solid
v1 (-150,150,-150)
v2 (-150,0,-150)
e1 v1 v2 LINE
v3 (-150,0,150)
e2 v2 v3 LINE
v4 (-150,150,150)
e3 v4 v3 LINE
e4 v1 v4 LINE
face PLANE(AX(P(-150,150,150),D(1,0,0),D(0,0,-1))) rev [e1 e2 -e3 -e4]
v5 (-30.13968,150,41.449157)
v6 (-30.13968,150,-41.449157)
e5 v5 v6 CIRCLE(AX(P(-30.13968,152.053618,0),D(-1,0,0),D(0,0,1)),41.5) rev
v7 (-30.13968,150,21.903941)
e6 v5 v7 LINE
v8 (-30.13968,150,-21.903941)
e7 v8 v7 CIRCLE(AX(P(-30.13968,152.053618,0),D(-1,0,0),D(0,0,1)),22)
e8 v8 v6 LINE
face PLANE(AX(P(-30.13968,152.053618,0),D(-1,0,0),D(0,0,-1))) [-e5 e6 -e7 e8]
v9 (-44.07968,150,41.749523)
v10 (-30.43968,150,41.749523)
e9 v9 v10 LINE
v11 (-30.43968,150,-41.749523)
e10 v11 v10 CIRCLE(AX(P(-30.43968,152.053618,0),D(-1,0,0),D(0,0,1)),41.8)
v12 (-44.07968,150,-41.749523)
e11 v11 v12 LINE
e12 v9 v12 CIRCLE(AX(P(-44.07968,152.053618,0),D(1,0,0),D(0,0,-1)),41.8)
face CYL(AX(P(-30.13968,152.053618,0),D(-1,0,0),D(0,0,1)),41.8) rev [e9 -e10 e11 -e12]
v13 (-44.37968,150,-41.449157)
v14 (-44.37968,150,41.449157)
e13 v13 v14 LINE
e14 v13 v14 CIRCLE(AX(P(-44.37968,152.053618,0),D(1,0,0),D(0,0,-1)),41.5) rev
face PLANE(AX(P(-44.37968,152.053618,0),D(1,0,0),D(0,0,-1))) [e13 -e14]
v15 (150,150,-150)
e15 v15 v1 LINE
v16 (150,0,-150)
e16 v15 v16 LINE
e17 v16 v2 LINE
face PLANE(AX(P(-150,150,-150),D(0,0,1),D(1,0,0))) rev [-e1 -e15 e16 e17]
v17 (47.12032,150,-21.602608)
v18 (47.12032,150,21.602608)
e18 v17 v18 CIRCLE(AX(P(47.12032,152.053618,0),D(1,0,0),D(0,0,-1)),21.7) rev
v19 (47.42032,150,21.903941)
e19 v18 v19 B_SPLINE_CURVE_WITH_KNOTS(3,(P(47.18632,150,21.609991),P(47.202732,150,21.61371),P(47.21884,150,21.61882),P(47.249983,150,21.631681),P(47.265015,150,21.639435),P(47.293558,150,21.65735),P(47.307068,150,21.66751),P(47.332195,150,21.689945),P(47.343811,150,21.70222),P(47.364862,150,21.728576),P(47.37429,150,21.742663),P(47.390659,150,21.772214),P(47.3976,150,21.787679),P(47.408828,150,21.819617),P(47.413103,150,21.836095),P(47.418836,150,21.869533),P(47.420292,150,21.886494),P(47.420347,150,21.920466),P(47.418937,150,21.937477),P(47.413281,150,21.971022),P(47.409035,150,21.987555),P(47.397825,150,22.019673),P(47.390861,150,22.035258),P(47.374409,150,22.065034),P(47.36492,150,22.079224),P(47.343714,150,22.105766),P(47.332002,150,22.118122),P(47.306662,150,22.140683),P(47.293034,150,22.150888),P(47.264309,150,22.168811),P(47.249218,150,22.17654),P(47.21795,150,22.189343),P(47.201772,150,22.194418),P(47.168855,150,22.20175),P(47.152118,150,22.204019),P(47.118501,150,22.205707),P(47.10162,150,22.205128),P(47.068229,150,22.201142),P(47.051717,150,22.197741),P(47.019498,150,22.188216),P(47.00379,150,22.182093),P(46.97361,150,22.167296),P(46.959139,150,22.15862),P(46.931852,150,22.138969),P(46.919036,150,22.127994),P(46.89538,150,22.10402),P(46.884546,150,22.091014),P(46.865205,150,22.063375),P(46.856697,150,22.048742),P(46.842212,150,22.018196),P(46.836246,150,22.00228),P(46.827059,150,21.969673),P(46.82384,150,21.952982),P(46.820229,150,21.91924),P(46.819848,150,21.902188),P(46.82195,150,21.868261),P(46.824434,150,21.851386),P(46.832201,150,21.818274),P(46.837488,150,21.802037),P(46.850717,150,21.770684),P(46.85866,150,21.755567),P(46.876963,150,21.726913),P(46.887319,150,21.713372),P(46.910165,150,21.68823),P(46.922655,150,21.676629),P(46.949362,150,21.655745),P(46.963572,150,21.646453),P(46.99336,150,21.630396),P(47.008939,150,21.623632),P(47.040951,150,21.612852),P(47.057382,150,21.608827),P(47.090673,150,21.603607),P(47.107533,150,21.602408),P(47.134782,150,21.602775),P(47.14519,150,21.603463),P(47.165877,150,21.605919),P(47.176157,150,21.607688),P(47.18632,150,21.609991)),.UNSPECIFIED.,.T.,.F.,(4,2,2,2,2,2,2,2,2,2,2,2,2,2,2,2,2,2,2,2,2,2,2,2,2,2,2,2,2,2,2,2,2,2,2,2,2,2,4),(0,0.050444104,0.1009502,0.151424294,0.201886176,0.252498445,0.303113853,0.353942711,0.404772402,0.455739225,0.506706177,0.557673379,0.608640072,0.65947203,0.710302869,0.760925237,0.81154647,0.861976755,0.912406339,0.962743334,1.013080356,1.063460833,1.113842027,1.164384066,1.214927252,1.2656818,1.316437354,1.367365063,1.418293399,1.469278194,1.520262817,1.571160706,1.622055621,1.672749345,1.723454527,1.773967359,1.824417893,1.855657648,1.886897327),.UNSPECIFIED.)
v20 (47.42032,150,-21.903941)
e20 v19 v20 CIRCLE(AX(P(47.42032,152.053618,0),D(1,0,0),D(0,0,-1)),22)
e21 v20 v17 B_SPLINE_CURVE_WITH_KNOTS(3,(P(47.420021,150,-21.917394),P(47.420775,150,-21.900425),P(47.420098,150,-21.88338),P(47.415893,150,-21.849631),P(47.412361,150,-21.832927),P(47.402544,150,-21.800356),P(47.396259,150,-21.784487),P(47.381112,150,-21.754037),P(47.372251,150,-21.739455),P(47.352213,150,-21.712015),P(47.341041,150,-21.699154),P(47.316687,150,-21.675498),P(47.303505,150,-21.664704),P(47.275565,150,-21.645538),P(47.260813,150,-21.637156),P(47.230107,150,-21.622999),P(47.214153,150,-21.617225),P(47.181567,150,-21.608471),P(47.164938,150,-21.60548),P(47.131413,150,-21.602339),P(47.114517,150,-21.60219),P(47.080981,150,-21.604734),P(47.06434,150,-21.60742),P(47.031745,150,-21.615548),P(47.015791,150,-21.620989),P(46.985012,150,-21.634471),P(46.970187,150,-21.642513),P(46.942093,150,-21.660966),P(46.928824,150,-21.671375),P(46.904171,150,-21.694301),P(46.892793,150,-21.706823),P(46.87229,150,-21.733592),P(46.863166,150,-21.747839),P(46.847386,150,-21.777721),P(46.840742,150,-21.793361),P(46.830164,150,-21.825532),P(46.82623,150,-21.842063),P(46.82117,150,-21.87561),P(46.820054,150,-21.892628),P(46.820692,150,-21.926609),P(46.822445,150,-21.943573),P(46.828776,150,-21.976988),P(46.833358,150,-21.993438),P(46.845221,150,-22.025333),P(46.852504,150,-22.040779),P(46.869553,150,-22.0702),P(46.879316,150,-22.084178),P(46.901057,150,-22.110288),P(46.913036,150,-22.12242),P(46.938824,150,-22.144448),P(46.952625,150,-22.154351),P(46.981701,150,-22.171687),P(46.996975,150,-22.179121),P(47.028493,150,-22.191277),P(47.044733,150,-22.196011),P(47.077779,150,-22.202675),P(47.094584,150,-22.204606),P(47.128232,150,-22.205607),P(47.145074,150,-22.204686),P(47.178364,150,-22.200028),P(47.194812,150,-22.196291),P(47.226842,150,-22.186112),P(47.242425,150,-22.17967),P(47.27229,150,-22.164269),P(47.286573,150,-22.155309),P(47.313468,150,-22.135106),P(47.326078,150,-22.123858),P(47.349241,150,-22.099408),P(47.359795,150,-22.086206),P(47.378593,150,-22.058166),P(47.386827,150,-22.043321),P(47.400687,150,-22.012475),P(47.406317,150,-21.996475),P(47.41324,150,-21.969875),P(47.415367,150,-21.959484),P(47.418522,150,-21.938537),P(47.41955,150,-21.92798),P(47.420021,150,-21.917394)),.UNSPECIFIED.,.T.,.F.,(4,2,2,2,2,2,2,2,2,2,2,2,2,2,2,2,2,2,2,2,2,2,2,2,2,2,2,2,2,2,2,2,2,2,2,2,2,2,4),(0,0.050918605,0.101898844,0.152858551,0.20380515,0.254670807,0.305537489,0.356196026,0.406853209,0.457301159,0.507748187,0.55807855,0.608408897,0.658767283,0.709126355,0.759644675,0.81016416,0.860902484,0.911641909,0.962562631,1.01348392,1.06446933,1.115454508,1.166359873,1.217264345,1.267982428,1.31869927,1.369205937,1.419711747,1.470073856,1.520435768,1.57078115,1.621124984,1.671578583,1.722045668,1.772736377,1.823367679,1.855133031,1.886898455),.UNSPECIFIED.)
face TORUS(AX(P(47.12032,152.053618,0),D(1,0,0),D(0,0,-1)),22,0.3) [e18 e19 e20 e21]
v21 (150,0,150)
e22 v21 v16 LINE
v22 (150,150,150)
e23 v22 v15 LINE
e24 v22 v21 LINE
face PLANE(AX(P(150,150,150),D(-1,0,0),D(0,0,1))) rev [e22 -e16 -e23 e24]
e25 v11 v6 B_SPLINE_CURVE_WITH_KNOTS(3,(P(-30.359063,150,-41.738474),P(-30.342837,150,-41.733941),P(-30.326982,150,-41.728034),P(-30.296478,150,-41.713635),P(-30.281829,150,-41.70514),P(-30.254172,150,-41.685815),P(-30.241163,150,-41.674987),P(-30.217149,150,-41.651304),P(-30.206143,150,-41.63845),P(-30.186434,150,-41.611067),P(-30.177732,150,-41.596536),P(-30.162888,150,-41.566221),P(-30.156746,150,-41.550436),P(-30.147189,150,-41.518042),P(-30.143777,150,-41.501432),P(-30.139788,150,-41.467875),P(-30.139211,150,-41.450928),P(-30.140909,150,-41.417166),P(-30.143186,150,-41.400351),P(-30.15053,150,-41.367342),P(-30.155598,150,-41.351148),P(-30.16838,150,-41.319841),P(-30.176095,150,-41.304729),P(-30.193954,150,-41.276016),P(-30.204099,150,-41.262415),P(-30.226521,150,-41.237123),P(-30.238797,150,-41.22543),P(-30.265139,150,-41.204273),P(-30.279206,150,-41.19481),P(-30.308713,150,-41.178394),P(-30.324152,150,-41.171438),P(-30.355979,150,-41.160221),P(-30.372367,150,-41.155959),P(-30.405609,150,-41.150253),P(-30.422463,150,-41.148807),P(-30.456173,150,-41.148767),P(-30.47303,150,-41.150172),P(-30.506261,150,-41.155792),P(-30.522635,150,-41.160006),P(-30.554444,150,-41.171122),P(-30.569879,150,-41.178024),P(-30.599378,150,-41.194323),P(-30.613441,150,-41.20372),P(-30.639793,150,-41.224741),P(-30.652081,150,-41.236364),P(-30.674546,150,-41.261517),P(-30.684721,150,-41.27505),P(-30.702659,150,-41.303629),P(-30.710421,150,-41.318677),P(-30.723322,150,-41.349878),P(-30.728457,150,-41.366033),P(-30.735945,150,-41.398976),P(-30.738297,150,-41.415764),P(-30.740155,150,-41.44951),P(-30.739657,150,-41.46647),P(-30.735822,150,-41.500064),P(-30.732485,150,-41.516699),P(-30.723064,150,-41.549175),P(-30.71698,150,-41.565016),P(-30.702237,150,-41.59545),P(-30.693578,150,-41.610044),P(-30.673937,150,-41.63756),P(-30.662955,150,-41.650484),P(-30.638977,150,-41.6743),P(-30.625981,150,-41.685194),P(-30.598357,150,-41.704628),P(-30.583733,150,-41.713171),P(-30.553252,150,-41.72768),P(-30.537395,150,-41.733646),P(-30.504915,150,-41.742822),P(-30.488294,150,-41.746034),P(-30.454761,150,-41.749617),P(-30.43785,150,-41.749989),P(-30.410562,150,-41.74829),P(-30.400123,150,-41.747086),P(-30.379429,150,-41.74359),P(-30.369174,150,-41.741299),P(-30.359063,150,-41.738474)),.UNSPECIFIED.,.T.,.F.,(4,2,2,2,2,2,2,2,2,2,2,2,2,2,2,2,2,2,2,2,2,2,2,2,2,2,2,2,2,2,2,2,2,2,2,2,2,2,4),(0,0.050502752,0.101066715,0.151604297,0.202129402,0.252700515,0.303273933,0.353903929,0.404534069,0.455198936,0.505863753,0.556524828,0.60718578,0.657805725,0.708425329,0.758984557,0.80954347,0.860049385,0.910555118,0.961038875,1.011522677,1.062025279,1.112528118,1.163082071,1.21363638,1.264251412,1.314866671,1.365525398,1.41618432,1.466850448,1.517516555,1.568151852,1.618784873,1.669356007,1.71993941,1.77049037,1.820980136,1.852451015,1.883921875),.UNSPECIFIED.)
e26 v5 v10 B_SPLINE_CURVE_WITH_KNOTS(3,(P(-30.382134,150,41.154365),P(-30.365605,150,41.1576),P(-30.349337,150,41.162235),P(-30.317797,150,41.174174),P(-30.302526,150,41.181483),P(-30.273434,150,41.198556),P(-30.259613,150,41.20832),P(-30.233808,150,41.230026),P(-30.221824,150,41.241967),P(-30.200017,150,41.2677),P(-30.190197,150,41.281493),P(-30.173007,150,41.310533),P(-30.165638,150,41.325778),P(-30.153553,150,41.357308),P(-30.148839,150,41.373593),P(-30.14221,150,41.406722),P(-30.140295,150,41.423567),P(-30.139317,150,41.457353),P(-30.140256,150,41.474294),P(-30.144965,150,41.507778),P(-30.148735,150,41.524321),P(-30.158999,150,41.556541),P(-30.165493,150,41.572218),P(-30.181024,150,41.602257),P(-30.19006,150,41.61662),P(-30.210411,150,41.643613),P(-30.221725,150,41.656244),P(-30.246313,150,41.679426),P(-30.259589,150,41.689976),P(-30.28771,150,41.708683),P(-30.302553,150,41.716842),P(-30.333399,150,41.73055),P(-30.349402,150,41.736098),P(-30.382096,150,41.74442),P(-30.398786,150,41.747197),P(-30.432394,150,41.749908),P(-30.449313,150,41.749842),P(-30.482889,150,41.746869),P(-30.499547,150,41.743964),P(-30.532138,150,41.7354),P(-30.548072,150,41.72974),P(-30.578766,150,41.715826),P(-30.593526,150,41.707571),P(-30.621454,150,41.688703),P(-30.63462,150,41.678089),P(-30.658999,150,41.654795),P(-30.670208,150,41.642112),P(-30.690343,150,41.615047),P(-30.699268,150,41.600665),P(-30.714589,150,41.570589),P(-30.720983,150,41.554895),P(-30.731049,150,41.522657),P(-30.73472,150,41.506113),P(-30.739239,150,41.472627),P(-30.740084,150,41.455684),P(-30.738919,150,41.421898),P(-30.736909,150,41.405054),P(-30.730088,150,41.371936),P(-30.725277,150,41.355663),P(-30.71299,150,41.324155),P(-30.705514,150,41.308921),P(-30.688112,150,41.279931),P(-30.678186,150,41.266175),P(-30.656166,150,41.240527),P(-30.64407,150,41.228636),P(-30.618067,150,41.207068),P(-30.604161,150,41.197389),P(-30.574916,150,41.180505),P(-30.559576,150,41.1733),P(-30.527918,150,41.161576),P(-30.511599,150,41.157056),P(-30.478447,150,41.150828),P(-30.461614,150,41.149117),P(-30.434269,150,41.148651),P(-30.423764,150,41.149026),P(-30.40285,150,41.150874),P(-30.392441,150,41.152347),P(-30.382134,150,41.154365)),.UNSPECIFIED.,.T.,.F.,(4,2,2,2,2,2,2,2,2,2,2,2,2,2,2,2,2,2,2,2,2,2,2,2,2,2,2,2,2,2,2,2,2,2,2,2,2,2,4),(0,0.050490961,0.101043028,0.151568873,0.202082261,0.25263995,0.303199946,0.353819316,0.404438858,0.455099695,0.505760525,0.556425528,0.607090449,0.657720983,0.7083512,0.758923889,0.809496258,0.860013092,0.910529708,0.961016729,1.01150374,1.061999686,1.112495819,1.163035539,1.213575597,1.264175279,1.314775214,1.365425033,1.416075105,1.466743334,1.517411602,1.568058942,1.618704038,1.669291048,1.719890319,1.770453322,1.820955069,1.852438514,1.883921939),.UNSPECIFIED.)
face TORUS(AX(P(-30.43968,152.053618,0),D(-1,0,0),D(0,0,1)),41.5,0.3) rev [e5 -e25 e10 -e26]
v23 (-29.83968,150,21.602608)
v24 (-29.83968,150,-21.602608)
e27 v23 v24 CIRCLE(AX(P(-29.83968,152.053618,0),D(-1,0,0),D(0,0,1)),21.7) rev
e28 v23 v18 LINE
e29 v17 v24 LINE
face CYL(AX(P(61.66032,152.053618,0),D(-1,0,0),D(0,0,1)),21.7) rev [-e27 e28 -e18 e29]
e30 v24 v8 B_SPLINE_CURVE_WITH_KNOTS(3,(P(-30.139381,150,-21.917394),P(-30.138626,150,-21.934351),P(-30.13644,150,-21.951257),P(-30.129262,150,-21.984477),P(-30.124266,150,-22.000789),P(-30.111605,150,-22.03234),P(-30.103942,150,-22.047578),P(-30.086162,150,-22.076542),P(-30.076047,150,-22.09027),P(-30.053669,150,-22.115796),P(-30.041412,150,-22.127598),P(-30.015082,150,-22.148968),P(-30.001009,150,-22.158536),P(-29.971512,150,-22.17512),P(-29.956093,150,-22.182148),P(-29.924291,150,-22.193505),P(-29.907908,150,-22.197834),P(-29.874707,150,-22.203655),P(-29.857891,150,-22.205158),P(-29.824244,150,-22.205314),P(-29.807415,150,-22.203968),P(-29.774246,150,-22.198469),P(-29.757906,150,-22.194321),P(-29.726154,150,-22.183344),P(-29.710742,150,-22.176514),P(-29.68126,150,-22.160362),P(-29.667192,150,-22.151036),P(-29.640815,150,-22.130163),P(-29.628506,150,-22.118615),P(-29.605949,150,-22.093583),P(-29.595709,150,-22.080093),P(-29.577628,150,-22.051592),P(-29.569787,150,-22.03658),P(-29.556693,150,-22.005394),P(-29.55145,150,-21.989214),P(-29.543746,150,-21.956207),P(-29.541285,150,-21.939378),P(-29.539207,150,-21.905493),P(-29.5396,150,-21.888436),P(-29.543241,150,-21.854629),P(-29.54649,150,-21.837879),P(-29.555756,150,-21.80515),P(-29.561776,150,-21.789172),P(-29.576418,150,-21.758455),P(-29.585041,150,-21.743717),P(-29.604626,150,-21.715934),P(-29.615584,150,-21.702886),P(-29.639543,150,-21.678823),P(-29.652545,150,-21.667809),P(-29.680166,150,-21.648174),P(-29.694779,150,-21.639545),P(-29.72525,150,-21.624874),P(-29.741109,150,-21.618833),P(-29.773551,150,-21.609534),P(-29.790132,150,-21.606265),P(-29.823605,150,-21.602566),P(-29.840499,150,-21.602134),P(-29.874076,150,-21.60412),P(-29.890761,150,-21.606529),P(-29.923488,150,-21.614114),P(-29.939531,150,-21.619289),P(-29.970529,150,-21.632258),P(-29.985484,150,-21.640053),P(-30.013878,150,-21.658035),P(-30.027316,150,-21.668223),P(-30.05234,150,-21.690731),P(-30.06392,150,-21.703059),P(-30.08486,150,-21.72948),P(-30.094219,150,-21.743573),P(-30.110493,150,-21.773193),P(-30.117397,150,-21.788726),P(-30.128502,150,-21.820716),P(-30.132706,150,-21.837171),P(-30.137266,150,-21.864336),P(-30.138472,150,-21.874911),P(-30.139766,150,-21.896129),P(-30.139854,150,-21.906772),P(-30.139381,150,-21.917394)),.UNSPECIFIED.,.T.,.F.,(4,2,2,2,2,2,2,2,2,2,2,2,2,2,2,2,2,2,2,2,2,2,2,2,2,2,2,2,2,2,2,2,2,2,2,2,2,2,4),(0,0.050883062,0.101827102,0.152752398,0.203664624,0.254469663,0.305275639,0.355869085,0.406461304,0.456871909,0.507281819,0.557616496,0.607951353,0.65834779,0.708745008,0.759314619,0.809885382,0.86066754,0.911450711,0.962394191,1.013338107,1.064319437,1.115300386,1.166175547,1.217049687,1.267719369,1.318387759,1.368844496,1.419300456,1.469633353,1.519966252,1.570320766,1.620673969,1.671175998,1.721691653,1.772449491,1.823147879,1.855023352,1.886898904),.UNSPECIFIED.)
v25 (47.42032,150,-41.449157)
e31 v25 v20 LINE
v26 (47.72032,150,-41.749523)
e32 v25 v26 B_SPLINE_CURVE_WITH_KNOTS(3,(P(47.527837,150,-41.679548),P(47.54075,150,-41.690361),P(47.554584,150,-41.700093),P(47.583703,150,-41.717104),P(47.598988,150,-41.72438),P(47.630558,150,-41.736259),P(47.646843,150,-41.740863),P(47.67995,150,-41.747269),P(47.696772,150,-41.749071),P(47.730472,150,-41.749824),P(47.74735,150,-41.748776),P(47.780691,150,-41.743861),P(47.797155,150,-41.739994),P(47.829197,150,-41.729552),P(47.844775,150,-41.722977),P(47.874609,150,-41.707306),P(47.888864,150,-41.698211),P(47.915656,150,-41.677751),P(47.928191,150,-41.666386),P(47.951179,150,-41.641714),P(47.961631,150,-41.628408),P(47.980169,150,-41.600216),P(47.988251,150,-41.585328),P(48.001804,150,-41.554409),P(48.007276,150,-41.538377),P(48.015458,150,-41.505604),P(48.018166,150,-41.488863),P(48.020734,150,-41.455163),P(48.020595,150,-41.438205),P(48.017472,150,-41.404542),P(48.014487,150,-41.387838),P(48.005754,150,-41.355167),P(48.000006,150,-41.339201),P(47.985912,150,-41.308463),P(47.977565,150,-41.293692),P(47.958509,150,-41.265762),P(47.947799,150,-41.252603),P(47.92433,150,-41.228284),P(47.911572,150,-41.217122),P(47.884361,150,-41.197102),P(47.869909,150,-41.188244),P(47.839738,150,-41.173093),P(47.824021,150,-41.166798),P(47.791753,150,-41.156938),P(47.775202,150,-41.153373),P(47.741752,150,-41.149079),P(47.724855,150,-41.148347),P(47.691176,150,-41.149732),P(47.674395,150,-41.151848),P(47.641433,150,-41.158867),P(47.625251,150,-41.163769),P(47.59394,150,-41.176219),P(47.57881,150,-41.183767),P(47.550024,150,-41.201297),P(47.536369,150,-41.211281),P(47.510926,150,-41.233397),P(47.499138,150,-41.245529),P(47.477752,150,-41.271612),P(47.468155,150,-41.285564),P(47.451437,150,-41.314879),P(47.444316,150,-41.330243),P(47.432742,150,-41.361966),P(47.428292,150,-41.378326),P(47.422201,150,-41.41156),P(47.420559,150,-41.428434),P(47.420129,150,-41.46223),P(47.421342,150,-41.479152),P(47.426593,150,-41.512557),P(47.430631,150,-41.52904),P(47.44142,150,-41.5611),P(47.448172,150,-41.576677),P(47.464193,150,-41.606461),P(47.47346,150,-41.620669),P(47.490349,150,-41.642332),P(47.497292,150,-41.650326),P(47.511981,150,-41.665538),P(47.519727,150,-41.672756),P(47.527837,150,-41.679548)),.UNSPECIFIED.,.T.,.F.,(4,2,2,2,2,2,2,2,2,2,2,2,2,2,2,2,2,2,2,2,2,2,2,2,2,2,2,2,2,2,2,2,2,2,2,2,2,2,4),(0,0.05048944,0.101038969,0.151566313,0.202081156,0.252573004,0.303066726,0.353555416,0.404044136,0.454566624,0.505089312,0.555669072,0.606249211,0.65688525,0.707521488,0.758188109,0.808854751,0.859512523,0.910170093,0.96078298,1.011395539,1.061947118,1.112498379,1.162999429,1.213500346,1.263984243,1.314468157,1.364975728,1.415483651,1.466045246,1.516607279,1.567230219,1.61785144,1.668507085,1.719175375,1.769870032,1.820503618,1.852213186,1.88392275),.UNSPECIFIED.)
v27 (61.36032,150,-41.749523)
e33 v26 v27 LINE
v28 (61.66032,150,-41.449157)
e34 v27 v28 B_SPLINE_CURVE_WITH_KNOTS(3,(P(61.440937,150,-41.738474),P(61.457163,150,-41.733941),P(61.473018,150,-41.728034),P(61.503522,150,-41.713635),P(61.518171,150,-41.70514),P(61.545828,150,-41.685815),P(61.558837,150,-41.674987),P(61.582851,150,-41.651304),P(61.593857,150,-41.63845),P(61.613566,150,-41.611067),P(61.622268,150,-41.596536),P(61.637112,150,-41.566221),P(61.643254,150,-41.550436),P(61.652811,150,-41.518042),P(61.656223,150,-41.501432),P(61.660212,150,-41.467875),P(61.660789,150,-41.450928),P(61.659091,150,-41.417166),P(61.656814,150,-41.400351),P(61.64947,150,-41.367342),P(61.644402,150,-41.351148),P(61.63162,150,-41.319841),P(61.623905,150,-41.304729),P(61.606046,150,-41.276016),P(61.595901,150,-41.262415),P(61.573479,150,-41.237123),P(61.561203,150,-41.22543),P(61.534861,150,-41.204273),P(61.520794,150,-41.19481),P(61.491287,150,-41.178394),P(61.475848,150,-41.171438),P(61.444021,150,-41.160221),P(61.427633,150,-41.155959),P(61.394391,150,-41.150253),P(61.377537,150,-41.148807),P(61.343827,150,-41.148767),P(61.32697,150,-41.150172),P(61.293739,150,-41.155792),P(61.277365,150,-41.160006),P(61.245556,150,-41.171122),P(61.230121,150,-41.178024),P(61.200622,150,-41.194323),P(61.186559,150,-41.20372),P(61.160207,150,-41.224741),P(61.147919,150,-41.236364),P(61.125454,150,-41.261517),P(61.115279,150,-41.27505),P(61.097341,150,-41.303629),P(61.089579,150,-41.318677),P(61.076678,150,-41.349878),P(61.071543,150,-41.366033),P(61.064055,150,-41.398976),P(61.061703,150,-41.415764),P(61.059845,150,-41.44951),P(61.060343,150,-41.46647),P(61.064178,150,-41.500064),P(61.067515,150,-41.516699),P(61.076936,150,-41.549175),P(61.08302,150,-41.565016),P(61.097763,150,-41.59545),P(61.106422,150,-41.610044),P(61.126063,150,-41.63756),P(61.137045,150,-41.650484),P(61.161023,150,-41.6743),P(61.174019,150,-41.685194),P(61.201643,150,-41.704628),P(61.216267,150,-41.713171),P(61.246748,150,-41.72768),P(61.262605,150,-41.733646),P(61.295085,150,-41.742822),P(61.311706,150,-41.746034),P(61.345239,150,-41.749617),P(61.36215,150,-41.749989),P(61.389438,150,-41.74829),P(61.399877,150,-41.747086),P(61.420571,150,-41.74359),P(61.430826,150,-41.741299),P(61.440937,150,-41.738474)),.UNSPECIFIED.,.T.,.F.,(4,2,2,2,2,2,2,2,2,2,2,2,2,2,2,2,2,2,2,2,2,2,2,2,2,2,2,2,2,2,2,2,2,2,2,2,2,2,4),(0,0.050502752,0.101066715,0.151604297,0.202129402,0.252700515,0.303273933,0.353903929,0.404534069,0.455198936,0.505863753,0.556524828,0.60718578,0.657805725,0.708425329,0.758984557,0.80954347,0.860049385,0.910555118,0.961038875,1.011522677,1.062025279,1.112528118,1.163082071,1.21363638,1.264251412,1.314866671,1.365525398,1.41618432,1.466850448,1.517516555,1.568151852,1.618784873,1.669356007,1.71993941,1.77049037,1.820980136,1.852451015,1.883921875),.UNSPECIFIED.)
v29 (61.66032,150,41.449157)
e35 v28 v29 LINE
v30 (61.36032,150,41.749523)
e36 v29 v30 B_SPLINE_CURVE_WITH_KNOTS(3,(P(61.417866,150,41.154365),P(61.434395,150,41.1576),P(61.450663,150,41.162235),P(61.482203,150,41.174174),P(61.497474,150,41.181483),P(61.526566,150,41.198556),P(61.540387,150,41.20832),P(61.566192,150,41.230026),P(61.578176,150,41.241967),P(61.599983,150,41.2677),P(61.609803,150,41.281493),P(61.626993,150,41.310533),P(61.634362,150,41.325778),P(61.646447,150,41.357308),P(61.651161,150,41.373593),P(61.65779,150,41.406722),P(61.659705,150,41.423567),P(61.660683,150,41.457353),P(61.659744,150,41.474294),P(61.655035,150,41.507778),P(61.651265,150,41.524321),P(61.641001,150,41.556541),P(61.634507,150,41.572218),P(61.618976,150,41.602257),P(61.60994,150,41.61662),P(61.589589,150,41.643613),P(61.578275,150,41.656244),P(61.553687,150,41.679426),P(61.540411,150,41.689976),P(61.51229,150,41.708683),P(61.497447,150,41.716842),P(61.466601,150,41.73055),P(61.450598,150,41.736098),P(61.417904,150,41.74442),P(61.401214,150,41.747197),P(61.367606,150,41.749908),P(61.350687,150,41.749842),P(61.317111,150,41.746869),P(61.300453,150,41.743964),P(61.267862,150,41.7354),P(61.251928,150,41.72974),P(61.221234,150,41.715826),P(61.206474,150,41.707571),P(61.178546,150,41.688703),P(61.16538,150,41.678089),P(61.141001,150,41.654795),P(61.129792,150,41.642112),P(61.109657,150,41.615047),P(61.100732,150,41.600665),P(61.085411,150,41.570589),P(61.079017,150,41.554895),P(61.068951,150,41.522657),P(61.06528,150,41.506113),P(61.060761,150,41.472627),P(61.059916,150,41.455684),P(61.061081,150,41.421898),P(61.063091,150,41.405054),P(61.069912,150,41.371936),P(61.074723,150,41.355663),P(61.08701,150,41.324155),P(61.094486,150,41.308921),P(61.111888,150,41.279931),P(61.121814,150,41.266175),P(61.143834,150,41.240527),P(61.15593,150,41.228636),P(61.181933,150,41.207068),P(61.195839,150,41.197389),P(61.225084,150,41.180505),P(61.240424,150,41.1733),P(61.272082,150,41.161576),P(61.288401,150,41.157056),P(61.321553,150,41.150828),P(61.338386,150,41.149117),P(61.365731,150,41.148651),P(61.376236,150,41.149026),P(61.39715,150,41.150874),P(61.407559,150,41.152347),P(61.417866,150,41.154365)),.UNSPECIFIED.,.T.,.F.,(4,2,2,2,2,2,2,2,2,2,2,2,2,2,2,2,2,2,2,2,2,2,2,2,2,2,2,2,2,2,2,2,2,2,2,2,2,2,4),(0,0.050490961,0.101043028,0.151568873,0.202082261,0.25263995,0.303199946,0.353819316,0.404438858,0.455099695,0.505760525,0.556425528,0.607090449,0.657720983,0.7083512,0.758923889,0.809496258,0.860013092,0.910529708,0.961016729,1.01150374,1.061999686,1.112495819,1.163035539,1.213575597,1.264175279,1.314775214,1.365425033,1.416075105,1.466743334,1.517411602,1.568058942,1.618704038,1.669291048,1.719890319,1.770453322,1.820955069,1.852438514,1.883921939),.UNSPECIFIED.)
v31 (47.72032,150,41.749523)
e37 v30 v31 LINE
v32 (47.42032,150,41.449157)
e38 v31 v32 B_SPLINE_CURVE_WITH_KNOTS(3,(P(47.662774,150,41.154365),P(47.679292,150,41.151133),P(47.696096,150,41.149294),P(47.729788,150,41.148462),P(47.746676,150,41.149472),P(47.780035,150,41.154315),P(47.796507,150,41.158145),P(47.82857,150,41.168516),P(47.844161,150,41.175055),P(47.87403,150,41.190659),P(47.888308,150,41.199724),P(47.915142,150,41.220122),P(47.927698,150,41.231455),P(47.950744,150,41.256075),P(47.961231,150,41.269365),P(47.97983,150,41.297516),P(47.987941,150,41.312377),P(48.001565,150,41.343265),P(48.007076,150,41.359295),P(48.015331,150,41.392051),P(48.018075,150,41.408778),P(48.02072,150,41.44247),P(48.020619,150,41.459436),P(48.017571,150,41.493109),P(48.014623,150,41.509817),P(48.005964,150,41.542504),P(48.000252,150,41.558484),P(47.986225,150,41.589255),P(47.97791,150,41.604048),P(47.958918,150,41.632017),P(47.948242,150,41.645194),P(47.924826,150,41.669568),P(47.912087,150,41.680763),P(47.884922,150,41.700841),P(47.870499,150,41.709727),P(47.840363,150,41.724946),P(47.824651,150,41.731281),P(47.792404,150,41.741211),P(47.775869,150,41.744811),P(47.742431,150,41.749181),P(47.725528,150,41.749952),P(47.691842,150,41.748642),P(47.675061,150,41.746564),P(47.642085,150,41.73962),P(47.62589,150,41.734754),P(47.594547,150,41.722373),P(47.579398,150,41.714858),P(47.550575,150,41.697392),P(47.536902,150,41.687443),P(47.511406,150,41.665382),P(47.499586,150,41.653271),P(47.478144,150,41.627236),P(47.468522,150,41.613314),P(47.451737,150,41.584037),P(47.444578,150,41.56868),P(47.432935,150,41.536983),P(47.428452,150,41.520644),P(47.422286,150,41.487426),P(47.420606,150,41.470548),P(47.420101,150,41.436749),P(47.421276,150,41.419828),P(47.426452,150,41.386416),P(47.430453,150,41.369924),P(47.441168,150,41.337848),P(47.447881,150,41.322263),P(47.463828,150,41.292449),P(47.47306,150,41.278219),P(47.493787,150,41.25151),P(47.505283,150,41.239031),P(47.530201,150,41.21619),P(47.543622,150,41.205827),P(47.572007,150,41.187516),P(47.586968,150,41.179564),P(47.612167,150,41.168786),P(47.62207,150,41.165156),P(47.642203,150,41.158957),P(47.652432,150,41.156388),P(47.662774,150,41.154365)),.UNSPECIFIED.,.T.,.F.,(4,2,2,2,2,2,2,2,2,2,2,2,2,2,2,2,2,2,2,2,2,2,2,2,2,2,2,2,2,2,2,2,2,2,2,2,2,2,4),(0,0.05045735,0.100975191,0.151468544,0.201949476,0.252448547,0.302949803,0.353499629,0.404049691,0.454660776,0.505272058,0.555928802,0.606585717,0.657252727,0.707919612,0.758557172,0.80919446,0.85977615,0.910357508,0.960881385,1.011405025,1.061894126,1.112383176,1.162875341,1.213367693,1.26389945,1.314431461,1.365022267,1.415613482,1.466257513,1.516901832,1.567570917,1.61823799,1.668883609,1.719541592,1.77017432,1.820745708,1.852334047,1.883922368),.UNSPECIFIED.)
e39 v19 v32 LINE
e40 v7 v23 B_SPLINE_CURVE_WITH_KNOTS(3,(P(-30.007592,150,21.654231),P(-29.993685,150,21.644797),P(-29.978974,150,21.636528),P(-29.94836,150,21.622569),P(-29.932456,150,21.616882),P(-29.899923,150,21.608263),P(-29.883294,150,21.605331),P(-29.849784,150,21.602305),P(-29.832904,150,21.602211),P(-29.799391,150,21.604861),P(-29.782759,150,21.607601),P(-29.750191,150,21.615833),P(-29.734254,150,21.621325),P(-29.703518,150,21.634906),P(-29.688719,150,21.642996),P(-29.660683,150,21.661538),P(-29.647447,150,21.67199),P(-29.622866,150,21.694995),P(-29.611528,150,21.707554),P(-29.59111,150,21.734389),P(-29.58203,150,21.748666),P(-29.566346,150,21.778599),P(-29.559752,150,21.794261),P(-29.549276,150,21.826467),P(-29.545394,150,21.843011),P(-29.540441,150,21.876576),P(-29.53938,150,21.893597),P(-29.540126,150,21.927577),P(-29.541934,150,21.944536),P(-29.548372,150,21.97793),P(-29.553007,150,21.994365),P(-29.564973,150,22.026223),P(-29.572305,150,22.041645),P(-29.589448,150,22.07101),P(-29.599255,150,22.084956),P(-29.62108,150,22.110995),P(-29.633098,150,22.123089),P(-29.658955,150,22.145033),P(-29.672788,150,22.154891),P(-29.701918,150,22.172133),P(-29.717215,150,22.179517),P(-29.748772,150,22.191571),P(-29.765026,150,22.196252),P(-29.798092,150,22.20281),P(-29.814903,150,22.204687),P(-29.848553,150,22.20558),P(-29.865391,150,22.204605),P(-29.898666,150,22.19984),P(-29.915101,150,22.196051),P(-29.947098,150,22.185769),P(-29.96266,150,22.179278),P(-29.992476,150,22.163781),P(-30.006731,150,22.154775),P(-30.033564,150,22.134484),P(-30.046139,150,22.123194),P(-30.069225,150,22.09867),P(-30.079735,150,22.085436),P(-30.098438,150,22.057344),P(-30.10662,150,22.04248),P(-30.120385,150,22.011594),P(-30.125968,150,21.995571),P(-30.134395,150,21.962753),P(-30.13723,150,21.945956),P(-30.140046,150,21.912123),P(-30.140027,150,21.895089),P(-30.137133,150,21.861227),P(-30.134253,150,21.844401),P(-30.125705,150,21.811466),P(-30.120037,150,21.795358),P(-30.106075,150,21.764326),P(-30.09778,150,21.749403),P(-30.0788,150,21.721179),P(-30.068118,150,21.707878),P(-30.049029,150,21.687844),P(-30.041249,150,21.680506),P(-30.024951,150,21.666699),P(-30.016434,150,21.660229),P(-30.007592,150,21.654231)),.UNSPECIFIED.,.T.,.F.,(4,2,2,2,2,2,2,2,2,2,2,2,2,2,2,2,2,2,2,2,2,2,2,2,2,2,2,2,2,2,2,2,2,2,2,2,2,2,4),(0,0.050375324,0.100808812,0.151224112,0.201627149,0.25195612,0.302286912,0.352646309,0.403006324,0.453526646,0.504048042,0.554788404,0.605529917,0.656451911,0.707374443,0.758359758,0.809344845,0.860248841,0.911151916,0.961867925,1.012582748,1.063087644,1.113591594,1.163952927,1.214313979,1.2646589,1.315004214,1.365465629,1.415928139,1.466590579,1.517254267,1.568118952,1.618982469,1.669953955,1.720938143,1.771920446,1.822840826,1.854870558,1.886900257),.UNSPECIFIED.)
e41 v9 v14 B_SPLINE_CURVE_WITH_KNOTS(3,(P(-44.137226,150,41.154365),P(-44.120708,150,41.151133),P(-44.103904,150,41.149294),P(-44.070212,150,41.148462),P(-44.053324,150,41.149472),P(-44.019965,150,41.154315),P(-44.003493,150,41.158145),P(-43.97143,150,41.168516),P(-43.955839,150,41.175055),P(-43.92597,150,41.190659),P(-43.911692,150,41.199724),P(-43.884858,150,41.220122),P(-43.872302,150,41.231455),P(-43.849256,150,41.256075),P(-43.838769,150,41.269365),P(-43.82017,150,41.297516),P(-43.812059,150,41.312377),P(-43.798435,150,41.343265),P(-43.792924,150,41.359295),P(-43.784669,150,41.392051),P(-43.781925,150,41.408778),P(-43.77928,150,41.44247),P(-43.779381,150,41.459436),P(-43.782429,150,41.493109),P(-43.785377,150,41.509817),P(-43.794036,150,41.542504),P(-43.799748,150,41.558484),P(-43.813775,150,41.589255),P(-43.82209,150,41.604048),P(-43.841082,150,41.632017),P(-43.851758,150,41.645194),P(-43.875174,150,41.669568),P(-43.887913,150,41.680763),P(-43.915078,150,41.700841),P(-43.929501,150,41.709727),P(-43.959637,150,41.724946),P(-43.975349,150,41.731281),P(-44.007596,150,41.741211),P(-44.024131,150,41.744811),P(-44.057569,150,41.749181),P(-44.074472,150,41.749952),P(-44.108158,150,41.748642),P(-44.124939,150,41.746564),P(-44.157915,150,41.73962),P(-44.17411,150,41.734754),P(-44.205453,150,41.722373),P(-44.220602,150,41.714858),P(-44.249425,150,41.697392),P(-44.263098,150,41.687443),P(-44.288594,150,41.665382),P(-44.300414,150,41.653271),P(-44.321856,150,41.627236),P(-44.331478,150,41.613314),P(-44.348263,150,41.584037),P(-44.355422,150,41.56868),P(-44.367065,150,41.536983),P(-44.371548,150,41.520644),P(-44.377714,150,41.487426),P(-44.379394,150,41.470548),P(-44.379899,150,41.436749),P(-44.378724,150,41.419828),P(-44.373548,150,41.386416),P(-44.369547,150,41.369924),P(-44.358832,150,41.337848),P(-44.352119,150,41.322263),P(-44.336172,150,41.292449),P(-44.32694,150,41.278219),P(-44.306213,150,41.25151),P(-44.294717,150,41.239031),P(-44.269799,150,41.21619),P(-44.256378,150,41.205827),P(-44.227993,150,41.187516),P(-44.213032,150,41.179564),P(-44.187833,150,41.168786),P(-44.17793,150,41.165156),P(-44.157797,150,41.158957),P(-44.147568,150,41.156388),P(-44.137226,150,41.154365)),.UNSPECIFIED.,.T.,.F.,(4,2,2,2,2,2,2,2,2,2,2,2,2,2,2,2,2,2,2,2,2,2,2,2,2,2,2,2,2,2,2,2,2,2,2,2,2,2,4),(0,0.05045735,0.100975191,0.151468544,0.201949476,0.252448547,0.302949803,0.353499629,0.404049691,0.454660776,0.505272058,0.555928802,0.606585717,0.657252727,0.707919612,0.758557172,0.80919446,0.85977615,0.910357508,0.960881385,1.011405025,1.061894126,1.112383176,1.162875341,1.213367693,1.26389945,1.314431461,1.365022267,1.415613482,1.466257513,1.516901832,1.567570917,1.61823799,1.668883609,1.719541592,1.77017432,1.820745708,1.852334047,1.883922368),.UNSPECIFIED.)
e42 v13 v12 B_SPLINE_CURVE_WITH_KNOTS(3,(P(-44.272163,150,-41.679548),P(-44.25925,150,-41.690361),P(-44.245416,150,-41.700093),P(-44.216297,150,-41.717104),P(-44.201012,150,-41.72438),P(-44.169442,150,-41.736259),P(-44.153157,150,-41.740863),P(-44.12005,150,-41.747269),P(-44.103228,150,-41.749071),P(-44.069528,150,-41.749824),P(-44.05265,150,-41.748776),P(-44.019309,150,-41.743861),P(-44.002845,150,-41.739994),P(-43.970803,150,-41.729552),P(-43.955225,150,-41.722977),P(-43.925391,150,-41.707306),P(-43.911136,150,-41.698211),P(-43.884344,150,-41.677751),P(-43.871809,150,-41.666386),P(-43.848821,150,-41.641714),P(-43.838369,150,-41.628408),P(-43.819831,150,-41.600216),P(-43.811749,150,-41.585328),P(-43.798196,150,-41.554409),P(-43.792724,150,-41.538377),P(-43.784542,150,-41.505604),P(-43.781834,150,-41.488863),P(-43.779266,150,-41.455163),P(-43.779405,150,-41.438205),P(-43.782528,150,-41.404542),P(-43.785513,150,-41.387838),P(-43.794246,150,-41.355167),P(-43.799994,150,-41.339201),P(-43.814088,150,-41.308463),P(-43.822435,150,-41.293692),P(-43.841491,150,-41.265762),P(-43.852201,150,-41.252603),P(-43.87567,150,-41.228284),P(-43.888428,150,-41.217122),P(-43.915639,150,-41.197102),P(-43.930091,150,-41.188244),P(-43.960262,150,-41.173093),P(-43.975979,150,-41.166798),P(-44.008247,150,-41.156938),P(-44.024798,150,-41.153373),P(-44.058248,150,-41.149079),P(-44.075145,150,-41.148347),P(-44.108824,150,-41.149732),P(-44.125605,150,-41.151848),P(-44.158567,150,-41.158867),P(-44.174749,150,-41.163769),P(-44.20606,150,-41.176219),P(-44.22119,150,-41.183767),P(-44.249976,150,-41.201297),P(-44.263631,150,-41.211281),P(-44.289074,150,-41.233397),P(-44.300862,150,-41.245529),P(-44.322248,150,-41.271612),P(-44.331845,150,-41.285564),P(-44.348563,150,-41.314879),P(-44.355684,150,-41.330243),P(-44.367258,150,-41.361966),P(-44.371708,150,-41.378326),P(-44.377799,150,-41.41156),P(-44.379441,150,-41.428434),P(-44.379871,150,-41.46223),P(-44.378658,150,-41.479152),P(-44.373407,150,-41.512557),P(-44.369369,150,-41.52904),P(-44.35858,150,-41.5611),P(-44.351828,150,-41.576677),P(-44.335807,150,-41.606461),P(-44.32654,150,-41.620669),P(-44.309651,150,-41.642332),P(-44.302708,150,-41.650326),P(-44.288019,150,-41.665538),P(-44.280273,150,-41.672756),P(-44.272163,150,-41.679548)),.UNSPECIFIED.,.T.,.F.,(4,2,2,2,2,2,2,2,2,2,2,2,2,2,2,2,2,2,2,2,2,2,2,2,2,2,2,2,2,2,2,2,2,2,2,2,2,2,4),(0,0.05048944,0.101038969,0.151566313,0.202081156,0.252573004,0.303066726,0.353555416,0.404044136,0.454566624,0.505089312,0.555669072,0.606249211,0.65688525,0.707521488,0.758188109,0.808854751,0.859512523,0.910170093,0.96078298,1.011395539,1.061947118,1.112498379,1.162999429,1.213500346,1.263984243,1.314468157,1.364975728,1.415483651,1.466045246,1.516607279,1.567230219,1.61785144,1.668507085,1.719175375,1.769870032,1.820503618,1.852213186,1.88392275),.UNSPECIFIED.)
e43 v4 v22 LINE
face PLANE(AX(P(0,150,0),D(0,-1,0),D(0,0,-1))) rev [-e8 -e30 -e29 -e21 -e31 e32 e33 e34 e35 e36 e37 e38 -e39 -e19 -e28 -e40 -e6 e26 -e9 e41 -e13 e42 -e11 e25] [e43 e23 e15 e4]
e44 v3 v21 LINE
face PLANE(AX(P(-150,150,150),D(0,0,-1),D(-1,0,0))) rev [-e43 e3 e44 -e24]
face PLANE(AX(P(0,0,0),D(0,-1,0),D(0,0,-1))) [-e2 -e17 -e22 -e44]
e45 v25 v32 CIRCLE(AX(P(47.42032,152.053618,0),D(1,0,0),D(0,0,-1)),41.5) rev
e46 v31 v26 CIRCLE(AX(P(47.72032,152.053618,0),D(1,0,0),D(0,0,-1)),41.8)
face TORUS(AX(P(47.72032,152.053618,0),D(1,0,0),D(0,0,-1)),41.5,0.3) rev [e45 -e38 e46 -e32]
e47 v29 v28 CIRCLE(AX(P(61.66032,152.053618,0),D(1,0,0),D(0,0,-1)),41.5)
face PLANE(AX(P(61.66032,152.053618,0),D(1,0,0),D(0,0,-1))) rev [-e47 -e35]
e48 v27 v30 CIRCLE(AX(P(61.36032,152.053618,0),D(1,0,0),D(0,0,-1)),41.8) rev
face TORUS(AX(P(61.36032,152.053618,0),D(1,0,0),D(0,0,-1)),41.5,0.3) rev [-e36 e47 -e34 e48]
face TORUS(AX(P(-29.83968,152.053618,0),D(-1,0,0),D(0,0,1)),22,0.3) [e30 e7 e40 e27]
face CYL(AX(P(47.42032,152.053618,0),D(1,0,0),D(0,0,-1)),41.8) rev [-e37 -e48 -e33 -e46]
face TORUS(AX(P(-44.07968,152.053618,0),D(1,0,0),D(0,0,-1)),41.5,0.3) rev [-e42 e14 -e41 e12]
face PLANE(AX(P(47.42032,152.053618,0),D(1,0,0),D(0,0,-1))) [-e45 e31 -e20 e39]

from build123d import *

# Parameters (mm, degrees)
SKETCH1_W           = 300
SKETCH1_H           = 300
BOSS_EXTRUDE1_DEPTH = 150


# Read off the part's stored shape, not the designer's step: Cavity1
with BuildPart() as part:
    # Sketch1 → Boss-Extrude1 (new body)
    with BuildSketch(Plane(origin=(0, 0, 0), x_dir=(1, 0, 0), z_dir=(0, 1, 0))):
        Rectangle(SKETCH1_W, SKETCH1_H)
    extrude(amount=BOSS_EXTRUDE1_DEPTH)

    # Cavity1 outline → Cavity1 (revolve, cut)
    with BuildSketch(Plane(origin=(0, 152.053618149, 0), x_dir=(0, 1, 0), z_dir=(0, 0, -1))):
        with BuildLine():
            Line((41.5, 61.660319704), (2.053618149, 61.660319704))
            Line((2.053618149, 61.660319704), (2.053618149, -44.379680296))
            Line((2.053618149, -44.379680296), (41.5, -44.379680296))
            ThreePointArc((41.5, -44.379680296), (41.712132035, -44.291812331), (41.8, -44.079680296))
            Line((41.8, -44.079680296), (41.8, -30.439680296))
            ThreePointArc((41.8, -30.439680296), (41.712132034, -30.227548262), (41.5, -30.139680296))
            Line((41.5, -30.139680296), (22, -30.139680296))
            ThreePointArc((22, -30.139680296), (21.787867965, -30.051812331), (21.7, -29.839680296))
            Line((21.7, -29.839680296), (21.7, 47.120319704))
            ThreePointArc((21.7, 47.120319704), (21.787867966, 47.332451738), (22, 47.420319704))
            Line((22, 47.420319704), (41.5, 47.420319704))
            ThreePointArc((41.5, 47.420319704), (41.712132035, 47.508187669), (41.8, 47.720319704))
            Line((41.8, 47.720319704), (41.8, 61.360319704))
            ThreePointArc((41.8, 61.360319704), (41.712132034, 61.572451738), (41.5, 61.660319704))
        make_face()
    revolve(axis=Axis((0, 152.053618149, 0), (1, 0, 0)), mode=Mode.SUBTRACT)


solid = part.part
